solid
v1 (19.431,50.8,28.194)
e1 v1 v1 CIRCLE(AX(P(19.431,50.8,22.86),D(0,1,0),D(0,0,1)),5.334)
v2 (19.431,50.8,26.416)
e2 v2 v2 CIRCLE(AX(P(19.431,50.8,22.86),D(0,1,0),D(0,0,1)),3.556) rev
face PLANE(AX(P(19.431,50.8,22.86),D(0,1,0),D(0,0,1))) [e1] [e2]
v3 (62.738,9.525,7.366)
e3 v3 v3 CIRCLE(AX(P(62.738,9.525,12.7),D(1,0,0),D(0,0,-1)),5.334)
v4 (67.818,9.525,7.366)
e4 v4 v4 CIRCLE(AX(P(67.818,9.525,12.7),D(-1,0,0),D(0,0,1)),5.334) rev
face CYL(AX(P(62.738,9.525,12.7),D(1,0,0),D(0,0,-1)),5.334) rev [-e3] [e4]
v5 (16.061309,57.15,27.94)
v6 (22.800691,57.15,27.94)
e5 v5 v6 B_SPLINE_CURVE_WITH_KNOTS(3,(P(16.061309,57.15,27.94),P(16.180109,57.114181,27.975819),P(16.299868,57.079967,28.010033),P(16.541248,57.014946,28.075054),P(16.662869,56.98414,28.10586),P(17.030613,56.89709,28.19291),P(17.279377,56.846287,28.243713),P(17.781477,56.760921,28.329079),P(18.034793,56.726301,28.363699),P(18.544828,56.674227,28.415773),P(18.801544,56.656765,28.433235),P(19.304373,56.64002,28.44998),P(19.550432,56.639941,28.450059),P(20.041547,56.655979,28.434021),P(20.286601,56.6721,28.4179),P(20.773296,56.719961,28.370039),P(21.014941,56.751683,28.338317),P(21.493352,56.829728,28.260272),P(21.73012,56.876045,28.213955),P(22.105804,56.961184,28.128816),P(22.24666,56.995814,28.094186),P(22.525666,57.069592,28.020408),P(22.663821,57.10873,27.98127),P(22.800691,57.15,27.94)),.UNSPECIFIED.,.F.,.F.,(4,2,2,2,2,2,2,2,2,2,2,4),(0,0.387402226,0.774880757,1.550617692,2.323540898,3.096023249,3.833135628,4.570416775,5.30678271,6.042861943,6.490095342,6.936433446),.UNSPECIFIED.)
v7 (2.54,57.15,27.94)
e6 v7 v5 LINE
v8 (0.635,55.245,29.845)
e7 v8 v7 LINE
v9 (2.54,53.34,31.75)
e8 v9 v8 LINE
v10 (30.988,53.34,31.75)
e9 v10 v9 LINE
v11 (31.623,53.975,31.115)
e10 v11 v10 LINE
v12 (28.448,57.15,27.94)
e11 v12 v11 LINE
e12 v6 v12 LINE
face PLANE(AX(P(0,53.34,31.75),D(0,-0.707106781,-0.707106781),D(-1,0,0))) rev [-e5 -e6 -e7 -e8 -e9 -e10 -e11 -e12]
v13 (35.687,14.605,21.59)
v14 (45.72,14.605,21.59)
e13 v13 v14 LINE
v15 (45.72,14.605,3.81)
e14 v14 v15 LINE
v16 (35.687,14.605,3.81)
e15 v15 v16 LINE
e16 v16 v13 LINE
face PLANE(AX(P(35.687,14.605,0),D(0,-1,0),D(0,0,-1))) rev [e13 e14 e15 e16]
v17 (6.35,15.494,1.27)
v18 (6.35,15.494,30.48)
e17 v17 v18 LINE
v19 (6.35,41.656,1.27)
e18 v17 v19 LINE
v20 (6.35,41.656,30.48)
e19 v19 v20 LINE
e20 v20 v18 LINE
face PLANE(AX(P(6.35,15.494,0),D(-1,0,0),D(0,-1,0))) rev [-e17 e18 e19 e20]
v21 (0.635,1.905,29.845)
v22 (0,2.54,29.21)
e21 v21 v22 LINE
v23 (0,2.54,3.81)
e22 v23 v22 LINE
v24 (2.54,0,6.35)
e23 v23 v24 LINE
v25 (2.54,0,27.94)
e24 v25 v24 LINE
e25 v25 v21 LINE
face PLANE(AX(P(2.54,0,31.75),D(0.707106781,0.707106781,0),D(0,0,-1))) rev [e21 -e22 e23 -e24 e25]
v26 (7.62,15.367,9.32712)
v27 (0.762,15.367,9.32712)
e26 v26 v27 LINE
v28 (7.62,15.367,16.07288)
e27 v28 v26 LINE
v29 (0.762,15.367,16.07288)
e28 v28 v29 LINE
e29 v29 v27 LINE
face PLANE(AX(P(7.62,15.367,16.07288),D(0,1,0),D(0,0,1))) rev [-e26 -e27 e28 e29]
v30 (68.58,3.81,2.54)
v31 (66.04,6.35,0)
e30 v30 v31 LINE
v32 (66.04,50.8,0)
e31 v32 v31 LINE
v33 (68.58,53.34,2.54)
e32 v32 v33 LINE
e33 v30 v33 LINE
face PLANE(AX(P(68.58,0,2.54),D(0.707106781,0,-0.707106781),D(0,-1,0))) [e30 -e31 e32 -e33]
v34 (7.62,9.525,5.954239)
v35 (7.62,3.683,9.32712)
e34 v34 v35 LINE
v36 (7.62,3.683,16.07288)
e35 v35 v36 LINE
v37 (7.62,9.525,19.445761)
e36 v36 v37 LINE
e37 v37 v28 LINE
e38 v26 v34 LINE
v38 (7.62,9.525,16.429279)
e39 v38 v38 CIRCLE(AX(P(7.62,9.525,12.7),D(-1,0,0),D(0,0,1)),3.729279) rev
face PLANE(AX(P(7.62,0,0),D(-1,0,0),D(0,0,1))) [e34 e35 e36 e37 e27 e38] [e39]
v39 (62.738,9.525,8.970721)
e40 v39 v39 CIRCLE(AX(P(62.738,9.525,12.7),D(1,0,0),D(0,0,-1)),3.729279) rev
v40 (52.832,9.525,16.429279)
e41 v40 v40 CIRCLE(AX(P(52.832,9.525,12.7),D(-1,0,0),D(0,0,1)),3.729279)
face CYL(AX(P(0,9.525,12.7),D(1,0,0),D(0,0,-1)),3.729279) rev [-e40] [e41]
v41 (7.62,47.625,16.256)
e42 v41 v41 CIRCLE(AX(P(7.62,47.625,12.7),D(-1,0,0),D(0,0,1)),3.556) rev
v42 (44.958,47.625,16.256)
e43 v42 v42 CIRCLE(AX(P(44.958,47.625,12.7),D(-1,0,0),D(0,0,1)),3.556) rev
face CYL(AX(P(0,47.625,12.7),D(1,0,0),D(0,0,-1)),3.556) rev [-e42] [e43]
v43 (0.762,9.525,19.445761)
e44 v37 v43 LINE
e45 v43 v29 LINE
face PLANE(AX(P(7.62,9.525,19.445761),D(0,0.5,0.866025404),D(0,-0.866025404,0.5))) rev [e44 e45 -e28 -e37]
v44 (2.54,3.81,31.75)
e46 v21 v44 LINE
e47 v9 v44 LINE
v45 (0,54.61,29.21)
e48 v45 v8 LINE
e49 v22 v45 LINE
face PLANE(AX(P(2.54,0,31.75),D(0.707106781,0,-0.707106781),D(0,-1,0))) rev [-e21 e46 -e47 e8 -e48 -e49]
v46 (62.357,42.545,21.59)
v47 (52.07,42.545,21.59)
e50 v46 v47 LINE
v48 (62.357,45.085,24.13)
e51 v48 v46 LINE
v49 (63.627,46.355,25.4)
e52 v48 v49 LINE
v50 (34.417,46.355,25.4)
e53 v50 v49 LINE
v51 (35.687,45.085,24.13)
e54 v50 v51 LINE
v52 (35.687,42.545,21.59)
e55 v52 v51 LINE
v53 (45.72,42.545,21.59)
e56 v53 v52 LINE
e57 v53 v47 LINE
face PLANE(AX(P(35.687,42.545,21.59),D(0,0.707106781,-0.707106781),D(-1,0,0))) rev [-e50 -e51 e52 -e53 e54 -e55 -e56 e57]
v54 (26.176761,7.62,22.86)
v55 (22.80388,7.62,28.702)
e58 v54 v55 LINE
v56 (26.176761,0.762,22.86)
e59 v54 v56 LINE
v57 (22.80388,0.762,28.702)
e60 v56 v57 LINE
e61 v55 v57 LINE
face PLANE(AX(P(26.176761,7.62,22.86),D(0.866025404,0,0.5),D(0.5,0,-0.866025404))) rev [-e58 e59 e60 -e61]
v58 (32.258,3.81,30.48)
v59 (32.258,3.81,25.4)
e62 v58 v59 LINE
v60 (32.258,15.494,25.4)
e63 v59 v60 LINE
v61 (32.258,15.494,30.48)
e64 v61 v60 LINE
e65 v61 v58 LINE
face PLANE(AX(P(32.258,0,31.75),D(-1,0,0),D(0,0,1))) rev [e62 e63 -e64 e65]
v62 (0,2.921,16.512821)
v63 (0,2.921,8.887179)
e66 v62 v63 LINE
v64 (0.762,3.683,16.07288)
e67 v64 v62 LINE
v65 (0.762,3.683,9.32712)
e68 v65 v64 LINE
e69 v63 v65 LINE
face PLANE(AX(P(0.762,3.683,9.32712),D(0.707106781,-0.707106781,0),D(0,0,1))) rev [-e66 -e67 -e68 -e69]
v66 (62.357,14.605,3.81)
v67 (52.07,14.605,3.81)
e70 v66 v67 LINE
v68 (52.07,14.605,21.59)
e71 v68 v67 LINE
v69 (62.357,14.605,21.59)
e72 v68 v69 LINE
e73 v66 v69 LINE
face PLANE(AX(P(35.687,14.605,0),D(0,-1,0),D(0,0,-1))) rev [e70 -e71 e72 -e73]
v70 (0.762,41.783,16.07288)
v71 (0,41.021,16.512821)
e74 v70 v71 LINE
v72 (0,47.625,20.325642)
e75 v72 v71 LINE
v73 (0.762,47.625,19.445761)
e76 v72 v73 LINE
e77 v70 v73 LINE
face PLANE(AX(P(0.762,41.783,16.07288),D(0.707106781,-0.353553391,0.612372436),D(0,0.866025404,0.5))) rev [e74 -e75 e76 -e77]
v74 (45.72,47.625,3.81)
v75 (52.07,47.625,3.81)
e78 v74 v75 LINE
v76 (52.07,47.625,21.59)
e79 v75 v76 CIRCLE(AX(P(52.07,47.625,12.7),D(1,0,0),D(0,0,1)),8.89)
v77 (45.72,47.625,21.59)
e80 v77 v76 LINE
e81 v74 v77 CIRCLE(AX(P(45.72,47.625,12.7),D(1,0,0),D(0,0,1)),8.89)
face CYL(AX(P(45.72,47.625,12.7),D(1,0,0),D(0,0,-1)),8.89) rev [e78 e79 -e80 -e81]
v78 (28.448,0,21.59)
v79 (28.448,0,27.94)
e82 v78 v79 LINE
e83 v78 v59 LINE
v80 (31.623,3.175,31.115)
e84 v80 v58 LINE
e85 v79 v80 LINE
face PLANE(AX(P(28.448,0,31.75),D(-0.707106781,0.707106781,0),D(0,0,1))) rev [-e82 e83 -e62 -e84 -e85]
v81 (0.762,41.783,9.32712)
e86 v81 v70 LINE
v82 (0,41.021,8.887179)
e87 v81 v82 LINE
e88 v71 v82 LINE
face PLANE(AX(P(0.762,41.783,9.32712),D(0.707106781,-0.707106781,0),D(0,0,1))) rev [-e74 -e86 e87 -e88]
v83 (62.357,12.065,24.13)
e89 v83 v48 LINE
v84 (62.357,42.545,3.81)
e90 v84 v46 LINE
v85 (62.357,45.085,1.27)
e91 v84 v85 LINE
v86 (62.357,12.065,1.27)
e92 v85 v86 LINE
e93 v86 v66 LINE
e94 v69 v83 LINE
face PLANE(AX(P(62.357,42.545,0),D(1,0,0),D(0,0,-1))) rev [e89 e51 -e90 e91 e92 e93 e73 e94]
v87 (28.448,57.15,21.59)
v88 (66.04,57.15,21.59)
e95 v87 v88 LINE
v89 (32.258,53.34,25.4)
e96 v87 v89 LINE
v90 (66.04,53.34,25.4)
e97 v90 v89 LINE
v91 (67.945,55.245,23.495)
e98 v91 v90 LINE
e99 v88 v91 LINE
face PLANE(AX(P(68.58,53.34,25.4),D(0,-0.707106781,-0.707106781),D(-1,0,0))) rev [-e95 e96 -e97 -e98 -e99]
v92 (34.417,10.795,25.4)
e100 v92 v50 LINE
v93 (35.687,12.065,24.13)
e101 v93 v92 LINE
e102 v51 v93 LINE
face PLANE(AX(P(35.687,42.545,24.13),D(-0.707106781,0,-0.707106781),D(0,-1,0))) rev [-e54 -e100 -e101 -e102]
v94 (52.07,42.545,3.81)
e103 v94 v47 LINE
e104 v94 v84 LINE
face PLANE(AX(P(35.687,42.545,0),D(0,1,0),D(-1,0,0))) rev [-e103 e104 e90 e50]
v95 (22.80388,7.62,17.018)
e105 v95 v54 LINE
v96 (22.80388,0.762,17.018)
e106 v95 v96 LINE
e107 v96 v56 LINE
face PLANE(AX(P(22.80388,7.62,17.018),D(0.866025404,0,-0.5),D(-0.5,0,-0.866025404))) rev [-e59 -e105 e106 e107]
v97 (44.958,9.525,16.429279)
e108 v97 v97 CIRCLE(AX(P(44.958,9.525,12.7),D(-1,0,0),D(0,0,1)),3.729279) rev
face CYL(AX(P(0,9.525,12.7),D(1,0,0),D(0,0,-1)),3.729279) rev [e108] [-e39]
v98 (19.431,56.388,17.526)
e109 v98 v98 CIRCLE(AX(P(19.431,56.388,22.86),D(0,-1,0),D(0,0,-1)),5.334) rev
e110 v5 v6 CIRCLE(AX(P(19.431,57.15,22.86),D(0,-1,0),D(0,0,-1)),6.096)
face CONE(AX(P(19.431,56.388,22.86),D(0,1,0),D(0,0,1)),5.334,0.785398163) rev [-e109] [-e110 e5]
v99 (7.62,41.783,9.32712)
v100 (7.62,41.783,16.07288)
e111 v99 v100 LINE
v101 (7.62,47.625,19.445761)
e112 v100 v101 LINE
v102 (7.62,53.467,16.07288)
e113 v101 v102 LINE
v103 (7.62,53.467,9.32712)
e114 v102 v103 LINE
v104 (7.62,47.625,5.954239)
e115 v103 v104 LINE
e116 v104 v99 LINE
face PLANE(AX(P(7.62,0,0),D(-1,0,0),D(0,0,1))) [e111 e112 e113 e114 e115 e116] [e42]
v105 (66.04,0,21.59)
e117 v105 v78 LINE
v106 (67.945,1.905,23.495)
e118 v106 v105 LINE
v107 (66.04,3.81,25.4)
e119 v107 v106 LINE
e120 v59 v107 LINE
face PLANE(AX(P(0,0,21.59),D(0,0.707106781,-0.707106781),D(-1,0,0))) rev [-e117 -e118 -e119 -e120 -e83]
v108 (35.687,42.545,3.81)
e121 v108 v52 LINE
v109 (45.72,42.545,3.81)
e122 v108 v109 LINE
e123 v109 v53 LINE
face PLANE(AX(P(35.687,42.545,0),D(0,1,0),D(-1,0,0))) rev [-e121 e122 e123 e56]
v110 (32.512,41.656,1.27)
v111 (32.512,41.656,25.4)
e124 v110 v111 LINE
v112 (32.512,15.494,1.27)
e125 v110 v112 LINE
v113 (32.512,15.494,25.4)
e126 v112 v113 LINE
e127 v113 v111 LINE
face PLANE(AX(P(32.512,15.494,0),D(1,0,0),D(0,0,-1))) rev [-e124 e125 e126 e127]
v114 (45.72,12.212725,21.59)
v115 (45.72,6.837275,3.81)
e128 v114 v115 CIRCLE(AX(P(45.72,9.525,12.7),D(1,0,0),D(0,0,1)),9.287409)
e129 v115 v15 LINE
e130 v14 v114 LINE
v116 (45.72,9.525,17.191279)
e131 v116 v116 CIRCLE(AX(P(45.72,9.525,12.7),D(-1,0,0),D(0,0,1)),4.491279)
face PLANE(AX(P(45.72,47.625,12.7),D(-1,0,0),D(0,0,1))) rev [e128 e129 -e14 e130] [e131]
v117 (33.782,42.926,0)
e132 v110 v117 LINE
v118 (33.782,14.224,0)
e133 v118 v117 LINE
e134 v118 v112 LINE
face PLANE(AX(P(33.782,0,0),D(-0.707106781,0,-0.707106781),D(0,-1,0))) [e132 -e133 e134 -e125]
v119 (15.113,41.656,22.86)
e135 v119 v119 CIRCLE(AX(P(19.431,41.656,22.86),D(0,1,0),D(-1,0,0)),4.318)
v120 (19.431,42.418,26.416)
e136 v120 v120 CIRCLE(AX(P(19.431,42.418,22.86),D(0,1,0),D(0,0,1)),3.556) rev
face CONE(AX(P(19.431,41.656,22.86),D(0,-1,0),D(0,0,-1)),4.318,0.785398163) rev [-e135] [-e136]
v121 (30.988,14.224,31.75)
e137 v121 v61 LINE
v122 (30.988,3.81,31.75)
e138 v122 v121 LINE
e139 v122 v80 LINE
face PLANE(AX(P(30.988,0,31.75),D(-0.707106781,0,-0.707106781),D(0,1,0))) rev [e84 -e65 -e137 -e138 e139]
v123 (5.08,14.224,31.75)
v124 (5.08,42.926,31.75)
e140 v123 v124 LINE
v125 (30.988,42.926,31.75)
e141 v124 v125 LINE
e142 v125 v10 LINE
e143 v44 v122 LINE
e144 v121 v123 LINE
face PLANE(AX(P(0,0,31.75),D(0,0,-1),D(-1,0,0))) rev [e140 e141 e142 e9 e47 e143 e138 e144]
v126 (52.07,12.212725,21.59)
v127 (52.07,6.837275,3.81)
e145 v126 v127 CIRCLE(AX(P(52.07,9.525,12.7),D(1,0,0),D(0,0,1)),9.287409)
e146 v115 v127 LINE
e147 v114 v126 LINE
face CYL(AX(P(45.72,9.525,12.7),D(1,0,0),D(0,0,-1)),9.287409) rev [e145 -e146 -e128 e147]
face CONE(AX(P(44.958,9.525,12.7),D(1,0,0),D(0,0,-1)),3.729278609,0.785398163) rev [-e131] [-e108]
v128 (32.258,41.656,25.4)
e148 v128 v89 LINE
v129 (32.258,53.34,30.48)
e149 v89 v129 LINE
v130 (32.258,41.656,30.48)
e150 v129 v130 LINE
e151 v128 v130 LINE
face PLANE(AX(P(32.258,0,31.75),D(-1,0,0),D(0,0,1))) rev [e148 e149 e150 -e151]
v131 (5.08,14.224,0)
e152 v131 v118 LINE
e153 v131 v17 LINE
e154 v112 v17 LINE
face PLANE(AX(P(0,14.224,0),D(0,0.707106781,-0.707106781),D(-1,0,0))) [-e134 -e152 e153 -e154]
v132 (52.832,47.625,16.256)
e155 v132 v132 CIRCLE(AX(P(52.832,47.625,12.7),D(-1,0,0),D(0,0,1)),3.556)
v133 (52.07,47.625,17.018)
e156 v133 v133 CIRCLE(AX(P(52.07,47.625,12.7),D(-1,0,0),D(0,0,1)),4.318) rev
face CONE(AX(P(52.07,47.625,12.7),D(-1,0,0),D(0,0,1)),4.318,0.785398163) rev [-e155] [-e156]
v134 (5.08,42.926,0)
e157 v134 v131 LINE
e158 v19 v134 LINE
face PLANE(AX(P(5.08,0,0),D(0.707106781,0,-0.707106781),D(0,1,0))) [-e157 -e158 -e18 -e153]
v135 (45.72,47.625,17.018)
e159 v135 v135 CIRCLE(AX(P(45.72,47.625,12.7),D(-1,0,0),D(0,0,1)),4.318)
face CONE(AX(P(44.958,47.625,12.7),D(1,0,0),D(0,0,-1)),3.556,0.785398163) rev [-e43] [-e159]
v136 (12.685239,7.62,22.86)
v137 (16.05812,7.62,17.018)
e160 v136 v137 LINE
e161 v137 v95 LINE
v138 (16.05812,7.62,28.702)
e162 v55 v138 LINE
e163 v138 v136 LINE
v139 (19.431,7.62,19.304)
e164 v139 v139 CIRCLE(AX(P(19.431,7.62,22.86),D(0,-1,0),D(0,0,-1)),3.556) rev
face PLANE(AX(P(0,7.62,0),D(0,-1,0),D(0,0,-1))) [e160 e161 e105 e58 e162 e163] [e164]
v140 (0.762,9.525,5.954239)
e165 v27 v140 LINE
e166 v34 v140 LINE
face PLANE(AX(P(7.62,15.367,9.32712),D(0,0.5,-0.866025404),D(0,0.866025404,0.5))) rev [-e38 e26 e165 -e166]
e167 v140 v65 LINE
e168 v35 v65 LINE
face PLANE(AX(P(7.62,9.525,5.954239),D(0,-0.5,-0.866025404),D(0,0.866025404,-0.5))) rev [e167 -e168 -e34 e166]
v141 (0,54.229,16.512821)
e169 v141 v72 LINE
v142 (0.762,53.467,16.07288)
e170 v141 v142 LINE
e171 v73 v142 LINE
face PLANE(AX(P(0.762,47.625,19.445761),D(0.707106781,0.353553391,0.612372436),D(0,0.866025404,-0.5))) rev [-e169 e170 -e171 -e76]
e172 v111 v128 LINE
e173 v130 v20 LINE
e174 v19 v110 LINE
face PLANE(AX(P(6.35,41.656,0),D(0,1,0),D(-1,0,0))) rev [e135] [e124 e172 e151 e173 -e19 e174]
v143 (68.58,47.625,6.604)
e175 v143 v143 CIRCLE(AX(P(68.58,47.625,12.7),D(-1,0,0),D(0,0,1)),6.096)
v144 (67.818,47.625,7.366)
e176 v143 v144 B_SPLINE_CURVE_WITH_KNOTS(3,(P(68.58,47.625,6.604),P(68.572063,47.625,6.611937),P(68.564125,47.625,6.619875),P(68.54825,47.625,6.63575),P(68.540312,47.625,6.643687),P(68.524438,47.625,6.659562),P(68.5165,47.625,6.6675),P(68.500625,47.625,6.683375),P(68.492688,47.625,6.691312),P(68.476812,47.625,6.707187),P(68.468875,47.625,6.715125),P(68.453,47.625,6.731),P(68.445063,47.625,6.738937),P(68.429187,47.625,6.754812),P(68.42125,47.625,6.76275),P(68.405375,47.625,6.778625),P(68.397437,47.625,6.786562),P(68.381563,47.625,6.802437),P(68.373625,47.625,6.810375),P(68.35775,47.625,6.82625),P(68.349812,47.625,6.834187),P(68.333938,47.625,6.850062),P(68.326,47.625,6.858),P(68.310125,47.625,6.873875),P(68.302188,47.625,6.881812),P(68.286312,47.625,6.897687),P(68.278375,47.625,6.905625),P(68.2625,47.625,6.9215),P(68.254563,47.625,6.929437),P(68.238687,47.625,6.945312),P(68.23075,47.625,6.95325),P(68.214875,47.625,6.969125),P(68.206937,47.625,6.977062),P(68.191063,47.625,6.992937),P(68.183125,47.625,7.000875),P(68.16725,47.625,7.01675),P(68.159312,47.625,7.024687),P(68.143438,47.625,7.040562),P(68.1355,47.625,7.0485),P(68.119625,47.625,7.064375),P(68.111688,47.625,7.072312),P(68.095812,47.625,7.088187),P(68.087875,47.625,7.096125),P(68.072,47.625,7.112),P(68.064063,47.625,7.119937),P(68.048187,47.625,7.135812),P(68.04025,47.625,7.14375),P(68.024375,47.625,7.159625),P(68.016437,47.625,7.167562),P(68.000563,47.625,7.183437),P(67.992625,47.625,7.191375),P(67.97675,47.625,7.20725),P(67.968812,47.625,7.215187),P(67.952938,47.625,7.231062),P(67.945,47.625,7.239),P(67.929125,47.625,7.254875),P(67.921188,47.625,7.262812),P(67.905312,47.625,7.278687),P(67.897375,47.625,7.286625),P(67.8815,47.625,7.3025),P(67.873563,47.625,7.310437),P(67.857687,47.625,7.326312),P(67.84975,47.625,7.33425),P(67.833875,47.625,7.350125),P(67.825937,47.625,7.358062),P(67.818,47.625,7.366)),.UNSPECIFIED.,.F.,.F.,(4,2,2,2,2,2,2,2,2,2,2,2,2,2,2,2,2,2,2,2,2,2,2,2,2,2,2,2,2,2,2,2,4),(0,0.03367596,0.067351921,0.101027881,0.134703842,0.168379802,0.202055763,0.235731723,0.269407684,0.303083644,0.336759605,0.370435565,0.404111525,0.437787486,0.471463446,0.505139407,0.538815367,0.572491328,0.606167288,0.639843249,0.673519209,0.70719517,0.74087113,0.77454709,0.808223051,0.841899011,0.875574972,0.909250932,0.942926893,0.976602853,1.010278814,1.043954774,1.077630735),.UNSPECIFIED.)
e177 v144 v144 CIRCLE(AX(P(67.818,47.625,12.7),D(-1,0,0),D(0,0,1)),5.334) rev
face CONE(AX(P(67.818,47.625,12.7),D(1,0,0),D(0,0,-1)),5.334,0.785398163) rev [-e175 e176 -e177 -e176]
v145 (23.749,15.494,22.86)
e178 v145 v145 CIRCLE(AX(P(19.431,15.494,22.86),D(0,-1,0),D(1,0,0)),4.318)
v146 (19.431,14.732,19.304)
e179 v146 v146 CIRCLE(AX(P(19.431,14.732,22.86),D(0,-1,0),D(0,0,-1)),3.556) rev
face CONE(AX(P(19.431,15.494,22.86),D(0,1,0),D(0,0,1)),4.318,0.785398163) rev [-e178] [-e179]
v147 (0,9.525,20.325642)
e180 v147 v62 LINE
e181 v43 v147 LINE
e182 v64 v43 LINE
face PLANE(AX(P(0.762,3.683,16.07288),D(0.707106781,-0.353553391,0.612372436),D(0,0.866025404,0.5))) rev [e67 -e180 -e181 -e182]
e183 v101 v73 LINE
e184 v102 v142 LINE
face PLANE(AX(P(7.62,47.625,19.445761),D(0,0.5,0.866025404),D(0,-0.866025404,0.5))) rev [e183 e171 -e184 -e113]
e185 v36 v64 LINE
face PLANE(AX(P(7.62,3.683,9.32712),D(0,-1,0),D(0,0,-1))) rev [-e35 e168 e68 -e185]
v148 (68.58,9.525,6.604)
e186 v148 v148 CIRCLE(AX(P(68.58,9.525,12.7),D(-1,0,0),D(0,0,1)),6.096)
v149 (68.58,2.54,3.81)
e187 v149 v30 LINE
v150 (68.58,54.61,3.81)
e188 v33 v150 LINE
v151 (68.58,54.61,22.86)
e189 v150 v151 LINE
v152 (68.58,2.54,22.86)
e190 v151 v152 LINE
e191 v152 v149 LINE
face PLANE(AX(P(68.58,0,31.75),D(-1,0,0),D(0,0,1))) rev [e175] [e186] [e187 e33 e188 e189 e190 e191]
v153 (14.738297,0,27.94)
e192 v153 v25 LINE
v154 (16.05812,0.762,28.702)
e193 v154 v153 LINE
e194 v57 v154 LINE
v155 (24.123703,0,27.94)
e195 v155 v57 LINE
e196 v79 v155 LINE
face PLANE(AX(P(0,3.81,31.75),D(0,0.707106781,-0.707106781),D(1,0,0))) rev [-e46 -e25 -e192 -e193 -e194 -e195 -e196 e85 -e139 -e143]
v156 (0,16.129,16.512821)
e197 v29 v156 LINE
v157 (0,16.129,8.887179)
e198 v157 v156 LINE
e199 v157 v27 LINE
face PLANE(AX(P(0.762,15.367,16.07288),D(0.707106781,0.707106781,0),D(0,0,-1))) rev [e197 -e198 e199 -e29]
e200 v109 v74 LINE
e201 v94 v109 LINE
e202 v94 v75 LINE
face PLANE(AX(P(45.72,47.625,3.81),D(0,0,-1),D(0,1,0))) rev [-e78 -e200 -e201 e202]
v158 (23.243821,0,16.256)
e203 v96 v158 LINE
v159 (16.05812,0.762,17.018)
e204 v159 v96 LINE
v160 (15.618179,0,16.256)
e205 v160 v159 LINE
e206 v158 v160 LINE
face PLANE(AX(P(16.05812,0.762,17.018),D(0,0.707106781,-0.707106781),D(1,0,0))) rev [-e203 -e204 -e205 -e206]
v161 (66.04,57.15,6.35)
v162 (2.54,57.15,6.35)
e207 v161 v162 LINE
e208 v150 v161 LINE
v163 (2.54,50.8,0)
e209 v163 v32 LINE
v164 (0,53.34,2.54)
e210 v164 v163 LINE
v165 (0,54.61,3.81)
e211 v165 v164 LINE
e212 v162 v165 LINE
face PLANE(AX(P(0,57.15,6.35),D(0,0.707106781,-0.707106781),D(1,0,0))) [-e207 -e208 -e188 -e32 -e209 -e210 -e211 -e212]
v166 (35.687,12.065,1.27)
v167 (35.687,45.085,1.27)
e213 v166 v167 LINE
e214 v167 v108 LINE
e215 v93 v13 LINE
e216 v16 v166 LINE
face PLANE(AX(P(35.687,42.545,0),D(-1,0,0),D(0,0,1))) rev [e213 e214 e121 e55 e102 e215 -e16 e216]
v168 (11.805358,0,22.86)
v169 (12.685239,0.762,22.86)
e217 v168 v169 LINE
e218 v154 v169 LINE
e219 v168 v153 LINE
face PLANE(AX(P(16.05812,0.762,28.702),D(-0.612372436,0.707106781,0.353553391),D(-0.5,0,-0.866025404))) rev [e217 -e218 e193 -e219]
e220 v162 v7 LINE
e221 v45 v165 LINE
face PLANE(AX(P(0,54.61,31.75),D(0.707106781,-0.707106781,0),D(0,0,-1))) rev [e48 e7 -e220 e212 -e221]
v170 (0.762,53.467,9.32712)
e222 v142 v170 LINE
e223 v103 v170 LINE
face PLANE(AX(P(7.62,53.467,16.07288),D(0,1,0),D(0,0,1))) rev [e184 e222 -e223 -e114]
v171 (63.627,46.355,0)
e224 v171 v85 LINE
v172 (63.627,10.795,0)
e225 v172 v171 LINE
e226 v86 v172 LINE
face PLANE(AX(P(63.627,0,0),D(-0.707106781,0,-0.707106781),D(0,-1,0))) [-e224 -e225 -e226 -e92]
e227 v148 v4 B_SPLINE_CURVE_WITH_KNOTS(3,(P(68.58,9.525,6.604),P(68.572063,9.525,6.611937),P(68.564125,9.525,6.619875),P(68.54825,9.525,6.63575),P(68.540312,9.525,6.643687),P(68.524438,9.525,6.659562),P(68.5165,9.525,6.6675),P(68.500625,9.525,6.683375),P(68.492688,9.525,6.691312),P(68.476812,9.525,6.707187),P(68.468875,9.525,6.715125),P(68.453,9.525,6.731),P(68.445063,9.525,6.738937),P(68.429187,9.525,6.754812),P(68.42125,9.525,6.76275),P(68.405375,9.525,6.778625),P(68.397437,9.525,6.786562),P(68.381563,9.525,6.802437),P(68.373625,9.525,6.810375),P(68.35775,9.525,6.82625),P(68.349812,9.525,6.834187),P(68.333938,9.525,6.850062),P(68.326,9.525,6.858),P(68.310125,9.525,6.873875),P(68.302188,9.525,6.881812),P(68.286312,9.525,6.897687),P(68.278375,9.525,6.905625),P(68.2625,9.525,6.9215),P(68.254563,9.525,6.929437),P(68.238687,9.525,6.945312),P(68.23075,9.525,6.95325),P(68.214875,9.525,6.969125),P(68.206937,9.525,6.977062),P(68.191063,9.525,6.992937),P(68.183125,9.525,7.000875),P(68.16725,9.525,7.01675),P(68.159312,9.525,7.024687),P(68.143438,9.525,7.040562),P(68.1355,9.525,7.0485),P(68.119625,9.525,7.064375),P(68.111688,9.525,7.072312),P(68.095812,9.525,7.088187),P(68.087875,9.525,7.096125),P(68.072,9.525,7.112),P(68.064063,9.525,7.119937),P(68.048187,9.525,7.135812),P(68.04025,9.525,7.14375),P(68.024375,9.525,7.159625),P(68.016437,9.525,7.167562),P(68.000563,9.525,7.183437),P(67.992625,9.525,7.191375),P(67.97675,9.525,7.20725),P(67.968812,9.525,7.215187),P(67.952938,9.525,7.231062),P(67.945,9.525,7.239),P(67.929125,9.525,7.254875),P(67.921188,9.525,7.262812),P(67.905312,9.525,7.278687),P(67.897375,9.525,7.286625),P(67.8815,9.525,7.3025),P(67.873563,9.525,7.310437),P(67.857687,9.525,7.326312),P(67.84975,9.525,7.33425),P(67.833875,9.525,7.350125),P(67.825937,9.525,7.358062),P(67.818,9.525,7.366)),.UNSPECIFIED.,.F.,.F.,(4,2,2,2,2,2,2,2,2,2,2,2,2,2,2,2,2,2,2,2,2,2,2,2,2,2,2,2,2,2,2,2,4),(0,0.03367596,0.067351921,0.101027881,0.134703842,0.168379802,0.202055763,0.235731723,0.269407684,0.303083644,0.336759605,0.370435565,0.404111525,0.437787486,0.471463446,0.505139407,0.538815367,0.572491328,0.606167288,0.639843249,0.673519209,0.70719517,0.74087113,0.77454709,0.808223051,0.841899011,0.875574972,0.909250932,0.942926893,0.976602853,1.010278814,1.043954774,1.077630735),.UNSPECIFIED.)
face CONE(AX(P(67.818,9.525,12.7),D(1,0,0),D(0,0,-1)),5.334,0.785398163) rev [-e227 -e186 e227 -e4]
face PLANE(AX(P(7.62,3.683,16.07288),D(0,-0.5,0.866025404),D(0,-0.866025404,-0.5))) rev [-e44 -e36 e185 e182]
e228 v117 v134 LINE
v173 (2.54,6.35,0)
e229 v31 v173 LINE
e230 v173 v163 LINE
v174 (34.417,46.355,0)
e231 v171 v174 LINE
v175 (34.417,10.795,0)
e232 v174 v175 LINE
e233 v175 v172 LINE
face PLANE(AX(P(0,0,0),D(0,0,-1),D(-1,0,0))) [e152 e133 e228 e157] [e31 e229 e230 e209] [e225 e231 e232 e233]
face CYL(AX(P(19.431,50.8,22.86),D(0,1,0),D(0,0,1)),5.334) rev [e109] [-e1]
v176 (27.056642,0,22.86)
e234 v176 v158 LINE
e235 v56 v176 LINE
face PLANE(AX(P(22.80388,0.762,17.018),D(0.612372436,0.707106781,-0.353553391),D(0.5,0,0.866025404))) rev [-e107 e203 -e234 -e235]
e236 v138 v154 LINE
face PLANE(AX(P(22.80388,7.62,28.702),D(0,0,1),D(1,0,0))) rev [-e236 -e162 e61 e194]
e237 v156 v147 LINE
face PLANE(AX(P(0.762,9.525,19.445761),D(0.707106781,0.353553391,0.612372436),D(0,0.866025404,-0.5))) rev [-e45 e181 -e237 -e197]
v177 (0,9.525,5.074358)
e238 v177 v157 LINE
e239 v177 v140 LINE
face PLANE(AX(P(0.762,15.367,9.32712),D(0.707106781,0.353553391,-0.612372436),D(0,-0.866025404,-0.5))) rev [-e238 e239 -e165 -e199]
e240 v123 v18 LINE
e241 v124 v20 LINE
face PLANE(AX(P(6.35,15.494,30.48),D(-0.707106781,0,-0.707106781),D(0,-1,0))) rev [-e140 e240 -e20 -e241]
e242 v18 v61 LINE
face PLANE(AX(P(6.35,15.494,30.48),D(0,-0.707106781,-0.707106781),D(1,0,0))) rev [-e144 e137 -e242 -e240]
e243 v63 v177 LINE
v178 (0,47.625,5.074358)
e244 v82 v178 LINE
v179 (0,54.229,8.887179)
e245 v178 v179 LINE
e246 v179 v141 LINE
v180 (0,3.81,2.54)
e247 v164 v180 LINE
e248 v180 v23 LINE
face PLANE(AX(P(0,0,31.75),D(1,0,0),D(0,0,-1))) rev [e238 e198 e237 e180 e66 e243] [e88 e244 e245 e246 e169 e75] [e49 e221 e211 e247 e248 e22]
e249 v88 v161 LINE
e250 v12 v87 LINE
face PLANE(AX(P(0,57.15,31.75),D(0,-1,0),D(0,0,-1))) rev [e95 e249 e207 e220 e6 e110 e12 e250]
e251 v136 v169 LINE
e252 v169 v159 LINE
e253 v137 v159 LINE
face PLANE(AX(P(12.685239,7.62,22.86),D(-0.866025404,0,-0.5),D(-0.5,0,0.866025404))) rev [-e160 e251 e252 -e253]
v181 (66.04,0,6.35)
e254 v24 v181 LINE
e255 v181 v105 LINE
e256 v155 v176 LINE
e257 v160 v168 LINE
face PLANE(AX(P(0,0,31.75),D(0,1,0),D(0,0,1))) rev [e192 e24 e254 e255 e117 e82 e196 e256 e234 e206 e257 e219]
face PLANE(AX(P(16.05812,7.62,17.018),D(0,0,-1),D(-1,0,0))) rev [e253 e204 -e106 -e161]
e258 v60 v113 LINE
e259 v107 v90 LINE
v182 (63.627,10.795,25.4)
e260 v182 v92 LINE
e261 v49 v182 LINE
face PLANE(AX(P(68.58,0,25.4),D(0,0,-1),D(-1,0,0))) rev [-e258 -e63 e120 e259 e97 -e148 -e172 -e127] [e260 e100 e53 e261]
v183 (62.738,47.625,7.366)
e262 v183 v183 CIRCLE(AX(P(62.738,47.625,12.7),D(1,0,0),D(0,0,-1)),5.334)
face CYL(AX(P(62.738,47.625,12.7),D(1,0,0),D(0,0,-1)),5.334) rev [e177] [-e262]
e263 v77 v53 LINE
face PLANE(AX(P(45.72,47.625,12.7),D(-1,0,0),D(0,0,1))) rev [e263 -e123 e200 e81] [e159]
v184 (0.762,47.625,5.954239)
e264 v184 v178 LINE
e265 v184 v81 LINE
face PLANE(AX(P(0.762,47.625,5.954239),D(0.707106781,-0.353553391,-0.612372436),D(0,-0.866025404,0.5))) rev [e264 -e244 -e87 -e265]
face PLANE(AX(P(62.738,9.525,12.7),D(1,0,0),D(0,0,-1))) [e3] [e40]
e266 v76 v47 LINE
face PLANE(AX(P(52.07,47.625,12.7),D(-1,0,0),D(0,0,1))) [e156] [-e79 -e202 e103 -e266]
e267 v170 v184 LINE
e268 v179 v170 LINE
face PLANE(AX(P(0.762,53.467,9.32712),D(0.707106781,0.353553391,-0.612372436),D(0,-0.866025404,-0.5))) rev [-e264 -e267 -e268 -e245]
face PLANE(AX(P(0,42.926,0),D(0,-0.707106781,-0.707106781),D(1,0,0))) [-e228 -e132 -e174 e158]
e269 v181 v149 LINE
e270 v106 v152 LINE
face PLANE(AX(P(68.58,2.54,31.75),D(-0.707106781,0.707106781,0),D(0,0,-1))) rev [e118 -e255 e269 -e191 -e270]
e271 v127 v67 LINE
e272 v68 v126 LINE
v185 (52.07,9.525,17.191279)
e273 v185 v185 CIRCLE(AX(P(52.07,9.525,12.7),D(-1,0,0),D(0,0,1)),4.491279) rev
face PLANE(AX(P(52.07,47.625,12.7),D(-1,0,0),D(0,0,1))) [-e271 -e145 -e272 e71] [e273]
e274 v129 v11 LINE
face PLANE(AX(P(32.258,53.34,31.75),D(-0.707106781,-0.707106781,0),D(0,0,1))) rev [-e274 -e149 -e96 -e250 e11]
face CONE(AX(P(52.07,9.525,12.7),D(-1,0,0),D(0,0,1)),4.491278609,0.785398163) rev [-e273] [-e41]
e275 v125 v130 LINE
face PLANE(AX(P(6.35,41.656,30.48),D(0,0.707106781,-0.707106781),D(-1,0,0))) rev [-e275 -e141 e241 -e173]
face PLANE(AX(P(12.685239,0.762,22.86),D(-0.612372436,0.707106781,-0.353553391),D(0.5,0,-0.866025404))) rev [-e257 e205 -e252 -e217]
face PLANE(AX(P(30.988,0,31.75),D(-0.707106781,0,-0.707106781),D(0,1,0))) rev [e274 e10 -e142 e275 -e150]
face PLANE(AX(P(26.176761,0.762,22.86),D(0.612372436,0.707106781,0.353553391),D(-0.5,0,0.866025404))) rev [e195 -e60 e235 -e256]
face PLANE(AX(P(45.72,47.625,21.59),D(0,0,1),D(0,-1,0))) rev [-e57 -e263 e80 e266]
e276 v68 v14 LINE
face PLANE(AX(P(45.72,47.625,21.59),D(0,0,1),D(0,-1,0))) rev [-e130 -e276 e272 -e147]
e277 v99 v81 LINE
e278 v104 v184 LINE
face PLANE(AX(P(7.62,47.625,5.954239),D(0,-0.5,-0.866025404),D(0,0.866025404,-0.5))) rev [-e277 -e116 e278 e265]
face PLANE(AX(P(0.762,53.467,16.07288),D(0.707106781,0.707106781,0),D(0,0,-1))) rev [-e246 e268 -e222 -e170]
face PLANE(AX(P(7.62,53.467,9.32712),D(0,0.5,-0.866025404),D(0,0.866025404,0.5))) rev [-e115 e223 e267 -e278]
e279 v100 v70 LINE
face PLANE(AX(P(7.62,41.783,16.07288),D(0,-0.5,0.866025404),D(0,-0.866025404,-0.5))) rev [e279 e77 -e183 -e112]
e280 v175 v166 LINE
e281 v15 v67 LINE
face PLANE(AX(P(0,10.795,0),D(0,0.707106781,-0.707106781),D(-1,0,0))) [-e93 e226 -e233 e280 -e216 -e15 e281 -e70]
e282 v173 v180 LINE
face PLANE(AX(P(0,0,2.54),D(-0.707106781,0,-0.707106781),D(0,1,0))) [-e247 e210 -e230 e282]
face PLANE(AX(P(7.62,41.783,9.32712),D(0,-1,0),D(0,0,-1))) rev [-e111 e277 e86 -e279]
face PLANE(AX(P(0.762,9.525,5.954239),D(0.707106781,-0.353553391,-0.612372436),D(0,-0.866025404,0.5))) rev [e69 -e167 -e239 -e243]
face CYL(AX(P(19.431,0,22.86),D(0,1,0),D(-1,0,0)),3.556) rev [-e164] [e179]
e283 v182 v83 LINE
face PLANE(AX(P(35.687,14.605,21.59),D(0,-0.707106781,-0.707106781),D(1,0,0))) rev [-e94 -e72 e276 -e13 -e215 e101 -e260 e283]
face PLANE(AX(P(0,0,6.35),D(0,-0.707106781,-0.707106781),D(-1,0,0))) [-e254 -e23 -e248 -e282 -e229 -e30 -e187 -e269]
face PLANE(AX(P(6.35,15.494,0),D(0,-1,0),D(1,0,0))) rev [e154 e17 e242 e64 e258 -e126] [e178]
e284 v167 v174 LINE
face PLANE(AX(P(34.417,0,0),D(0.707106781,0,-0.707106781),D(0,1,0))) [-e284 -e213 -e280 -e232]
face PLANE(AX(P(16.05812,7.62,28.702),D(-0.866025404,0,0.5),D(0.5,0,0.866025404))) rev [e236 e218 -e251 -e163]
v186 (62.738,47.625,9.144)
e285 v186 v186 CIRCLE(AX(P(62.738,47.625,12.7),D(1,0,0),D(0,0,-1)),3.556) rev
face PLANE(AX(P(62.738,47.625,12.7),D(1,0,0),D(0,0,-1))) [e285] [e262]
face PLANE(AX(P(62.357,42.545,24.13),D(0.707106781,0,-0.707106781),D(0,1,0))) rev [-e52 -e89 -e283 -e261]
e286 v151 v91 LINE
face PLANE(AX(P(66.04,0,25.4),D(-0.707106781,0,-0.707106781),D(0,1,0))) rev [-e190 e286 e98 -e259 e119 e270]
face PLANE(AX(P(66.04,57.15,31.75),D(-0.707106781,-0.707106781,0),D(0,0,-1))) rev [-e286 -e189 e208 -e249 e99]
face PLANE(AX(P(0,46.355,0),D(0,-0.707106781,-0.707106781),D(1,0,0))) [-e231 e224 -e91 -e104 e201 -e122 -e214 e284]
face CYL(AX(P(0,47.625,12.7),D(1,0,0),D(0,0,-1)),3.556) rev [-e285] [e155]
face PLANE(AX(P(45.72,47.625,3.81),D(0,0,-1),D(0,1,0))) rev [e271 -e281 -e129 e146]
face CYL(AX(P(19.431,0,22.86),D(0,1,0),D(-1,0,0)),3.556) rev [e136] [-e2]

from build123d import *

# Parameters (mm, degrees)
SKETCH1_W               = 68.58
SKETCH1_H               = 57.15
BOSS_EXTRUDE1_DEPTH     = 31.75
SKETCH2_W               = 26.162
SKETCH2_H               = 26.162
SKETCH2_W_2             = 26.67
SKETCH2_H_2             = 27.94
CUT_EXTRUDE1_DEPTH      = 95.749149864
SKETCH5_R               = 3.556
SKETCH5_R_2             = 3.729278609
CUT_EXTRUDE2_DEPTH      = 95.749149864
CUT_EXTRUDE3_START      = -16.51
CUT_EXTRUDE3_DEPTH      = 6.35
SKETCH7_R               = 5.334
CUT_EXTRUDE4_DEPTH      = 5.842
CUT_EXTRUDE5_DEPTH      = 7.62
SKETCH10_W              = 36.322
SKETCH10_H              = 6.35
CUT_EXTRUDE6_DEPTH      = 95.749149864
CUT_EXTRUDE7_DEPTH      = 87.293112332
CUT_EXTRUDE7_DEPTH_BACK = 87.293112332
SKETCH12_R              = 3.556
SKETCH13_R              = 5.334
CUT_EXTRUDE8_DEPTH      = 6.35
CUT_EXTRUDE9_DEPTH      = 7.62
CHAMFER1_SIZE           = 0.762
CHAMFER3_SIZE           = 3.81
CHAMFER5_SIZE           = 1.27
CHAMFER6_SIZE           = 2.54
CHAMFER9_SIZE           = 3.81
CHAMFER10_SIZE          = 6.35


# Some blends are built 0.0001 mm under size
with BuildPart() as part:
    # Sketch1 → Boss-Extrude1 (new body)
    with BuildSketch(Plane.XY):
        with Locations((34.29, 28.575)):
            Rectangle(SKETCH1_W, SKETCH1_H)
    extrude(amount=BOSS_EXTRUDE1_DEPTH)

    # Sketch2 → Cut-Extrude1 (cut, through all)
    with BuildSketch(Plane.XY.offset(31.75)):
        with Locations((19.431, 28.575)):
            Rectangle(SKETCH2_W, SKETCH2_H)
        with Locations((49.022, 28.575)):
            Rectangle(SKETCH2_W_2, SKETCH2_H_2)
    extrude(amount=-CUT_EXTRUDE1_DEPTH, mode=Mode.SUBTRACT)

    # Sketch5 → Cut-Extrude2 (cut, through all)
    with BuildSketch(Plane(origin=(68.58, 0, 0), x_dir=(0, 0, -1), z_dir=(1, 0, 0))):
        with Locations((-12.7, 47.625)):
            Circle(SKETCH5_R)
        with Locations((-12.7, 9.525)):
            Circle(SKETCH5_R_2)
    extrude(amount=-CUT_EXTRUDE2_DEPTH, mode=Mode.SUBTRACT)

    # Sketch6 → Cut-Extrude3 (cut)
    with BuildSketch(Plane(origin=(68.58, 0, 0), x_dir=(0, 0, -1), z_dir=(1, 0, 0)).offset(CUT_EXTRUDE3_START)):
        with BuildLine():
            Line((-21.59, 47.625), (-21.59, 12.21272508))
            ThreePointArc((-21.59, 12.21272508), (-15.38772508, 0.635), (-3.81, 6.83727492))
            Line((-3.81, 6.83727492), (-3.81, 47.625))
            ThreePointArc((-3.81, 47.625), (-12.7, 56.515), (-21.59, 47.625))
        make_face()
    extrude(amount=-CUT_EXTRUDE3_DEPTH, mode=Mode.SUBTRACT)

    # Sketch7 → Cut-Extrude4 (cut)
    with BuildSketch(Plane(origin=(68.58, 0, 0), x_dir=(0, 0, -1), z_dir=(1, 0, 0))):
        with Locations((-12.7, 47.625)):
            Circle(SKETCH7_R)
        with Locations((-12.7, 9.525)):
            Circle(SKETCH7_R)
    extrude(amount=-CUT_EXTRUDE4_DEPTH, mode=Mode.SUBTRACT)

    # Sketch9 → Cut-Extrude5 (cut)
    with BuildSketch(Plane.ZY):
        Polygon((16.072880273, 53.467), (9.327119727, 53.467), (5.954239455, 47.625), (9.327119727, 41.783), (16.072880273, 41.783), (19.445760545, 47.625), align=None)
        Polygon((16.072880273, 15.367), (9.327119727, 15.367), (5.954239455, 9.525), (9.327119727, 3.683), (16.072880273, 3.683), (19.445760545, 9.525), align=None)
    extrude(amount=-CUT_EXTRUDE5_DEPTH, mode=Mode.SUBTRACT)

    # Sketch10 → Cut-Extrude6 (cut, through all)
    with BuildSketch(Plane(origin=(0, 57.15, 0), x_dir=(1, 0, 0), z_dir=(0, 1, 0))):
        with Locations((50.419, -28.575)):
            Rectangle(SKETCH10_W, SKETCH10_H)
    extrude(amount=-CUT_EXTRUDE6_DEPTH, mode=Mode.SUBTRACT)

    # Sketch12 → Cut-Extrude7 (cut, two sides: drawn at the far end of the back side and taken through both)
    with BuildSketch(Plane(origin=(0, 15.494, 0), x_dir=(1, 0, 0), z_dir=(0, 1, 0)).offset(-CUT_EXTRUDE7_DEPTH_BACK)):
        with Locations(Location((19.431, -22.86, 0), (0, 0, 180))):
            Circle(SKETCH12_R)
    extrude(amount=CUT_EXTRUDE7_DEPTH + CUT_EXTRUDE7_DEPTH_BACK, mode=Mode.SUBTRACT)

    # Sketch13 → Cut-Extrude8 (cut)
    with BuildSketch(Plane(origin=(0, 57.15, 0), x_dir=(1, 0, 0), z_dir=(0, 1, 0))):
        with Locations(Location((19.431, -22.86, 0), (0, 0, 270))):
            Circle(SKETCH13_R)
    extrude(amount=-CUT_EXTRUDE8_DEPTH, mode=Mode.SUBTRACT)

    # Sketch14 → Cut-Extrude9 (cut)
    with BuildSketch(Plane.XZ):
        Polygon((22.803880273, 28.702), (16.058119727, 28.702), (12.685239455, 22.86), (16.058119727, 17.018), (22.803880273, 17.018), (26.176760545, 22.86), align=None)
    extrude(amount=-CUT_EXTRUDE9_DEPTH, mode=Mode.SUBTRACT)

    # Chamfer1
    chamfer1_edges = [part.edges().sort_by_distance(p)[0] for p in [
        (0, 50.546, 17.759320409),
        (0, 53.467, 12.7),
        (0, 50.546, 7.640679591),
        (0, 44.704, 7.640679591),
        (0, 41.783, 12.7),
        (0, 44.704, 17.759320409),
        (0, 12.446, 17.759320409),
        (0, 15.367, 12.7),
        (0, 12.446, 7.640679591),
        (0, 6.604, 7.640679591),
        (0, 3.683, 12.7),
        (0, 6.604, 17.759320409),
        (22.987, 41.656, 22.86),
        (22.987, 15.494, 22.86),
        (19.431, 57.15, 17.526),
        (24.490320409, 0, 25.781),
        (19.431, 0, 28.702),
        (14.371679591, 0, 25.781),
        (14.371679591, 0, 19.939),
        (19.431, 0, 17.018),
        (24.490320409, 0, 19.939),
        (45.72, 47.625, 16.256),
        (45.72, 9.525, 16.429278609),
        (52.07, 9.525, 16.429278609),
        (52.07, 47.625, 16.256),
        (68.58, 47.625, 18.034),
        (68.58, 9.525, 18.034),
    ]]
    chamfer(chamfer1_edges, length=CHAMFER1_SIZE)

    # Chamfer3
    chamfer3_edges = [part.edges().sort_by_distance(p)[0] for p in [
        (49.022, 42.545, 25.4),
        (49.022, 14.605, 25.4),
        (49.022, 42.545, 0),
        (49.022, 14.605, 0),
    ]]
    chamfer(chamfer3_edges, length=CHAMFER3_SIZE - 0.0001)  # a hair under: the kernel refuses the full size

    # Chamfer5
    chamfer5_edges = [part.edges().sort_by_distance(p)[0] for p in [
        (19.304, 41.656, 31.75),
        (32.258, 49.403, 31.75),
        (32.258, 7.747, 31.75),
        (35.687, 28.575, 25.4),
        (62.357, 28.575, 25.4),
        (6.35, 28.575, 0),
        (19.431, 41.656, 0),
        (32.512, 28.575, 0),
        (19.431, 15.494, 0),
        (6.35, 28.575, 31.75),
        (19.304, 15.494, 31.75),
        (35.687, 28.575, 0),
        (62.357, 28.575, 0),
    ]]
    chamfer(chamfer5_edges, length=CHAMFER5_SIZE)

    # Chamfer6
    chamfer6_edges = [part.edges().sort_by_distance(p)[0] for p in [
        (68.58, 57.15, 12.7),
        (68.58, 0, 12.7),
        (68.58, 28.575, 25.4),
        (0, 28.575, 31.75),
        (68.58, 28.575, 0),
        (0, 28.575, 0),
        (0, 57.15, 15.875),
        (0, 0, 15.875),
    ]]
    chamfer(chamfer6_edges, length=CHAMFER6_SIZE)

    # Chamfer9
    # the kernel refuses this chamfer: 3.81 mm, written as the material it takes off along each edge
    with BuildSketch(Plane(origin=(32.258, 57.15, 25.4), x_dir=(0, 0.027495876610586386, -0.9996219169112968), z_dir=(1, 0, 0))) as chamfer9_piece_1:
        Polygon((CHAMFER9_SIZE * 0.999621916911, -CHAMFER9_SIZE * 0.0274958766106), (-CHAMFER9_SIZE * 0.0274958766106, -CHAMFER9_SIZE * 0.999621916911), (0, 0), align=None)
    extrude(amount=43.580112184, mode=Mode.SUBTRACT)
    with BuildSketch(Plane(origin=(32.258, 57.15, 40.278112184), x_dir=(-0.9996219169112968, 0.027495876610586414, 0), z_dir=(0, 0, -1))) as chamfer9_piece_2:
        Polygon((CHAMFER9_SIZE * 0.999621916911, -CHAMFER9_SIZE * 0.0274958766106), (-CHAMFER9_SIZE * 0.0274958766106, -CHAMFER9_SIZE * 0.999621916911), (0, 0), align=None)
    extrude(amount=14.878112184, mode=Mode.SUBTRACT)
    with BuildSketch(Plane(origin=(40.786112184, 57.15, 31.75), x_dir=(0, 0.027495876610586386, -0.9996219169112968), z_dir=(-1, 0, 0)), Plane(origin=(-7.258112184, 0, 31.75), x_dir=(0, -0.027495876610586376, -0.9996219169112968), z_dir=(1, 0, 0))) as chamfer9_piece_3:
        Polygon((CHAMFER9_SIZE * 0.999621916911, CHAMFER9_SIZE * 0.0274958766106), (-CHAMFER9_SIZE * 0.0274958766106, CHAMFER9_SIZE * 0.999621916911), (0, 0), align=None)
    extrude(amount=48.044224368, mode=Mode.SUBTRACT)
    with BuildSketch(Plane(origin=(32.258, 0, 40.278112184), x_dir=(-0.9996219169112968, -0.02749587661058639, 0), z_dir=(0, 0, -1))) as chamfer9_piece_4:
        Polygon((CHAMFER9_SIZE * 0.999621916911, CHAMFER9_SIZE * 0.0274958766106), (-CHAMFER9_SIZE * 0.0274958766106, CHAMFER9_SIZE * 0.999621916911), (0, 0), align=None)
    extrude(amount=14.878112184, mode=Mode.SUBTRACT)
    with BuildSketch(Plane(origin=(32.258, 0, 25.4), x_dir=(0, -0.027495876610586403, -0.9996219169112968), z_dir=(1, 0, 0))) as chamfer9_piece_5:
        Polygon((CHAMFER9_SIZE * 0.999621916911, CHAMFER9_SIZE * 0.0274958766106), (-CHAMFER9_SIZE * 0.0274958766106, CHAMFER9_SIZE * 0.999621916911), (0, 0), align=None)
    extrude(amount=43.580112184, mode=Mode.SUBTRACT)
    with BuildSketch(Plane(origin=(32.258, 57.15, 40.278112184), x_dir=(-0.9996219169112968, 0.027495876610586414, 0), z_dir=(0, 0, -1))) as chamfer9_piece_6a_section:
        Polygon((CHAMFER9_SIZE * 0.999621916911, -CHAMFER9_SIZE * 0.0274958766106), (-CHAMFER9_SIZE * 0.0274958766106, -CHAMFER9_SIZE * 0.999621916911), (0, 0), align=None)
    chamfer9_piece_6a = extrude(amount=24.676224368, mode=Mode.PRIVATE)
    chamfer9_piece_6a = split(chamfer9_piece_6a, bisect_by=Plane(origin=(31.001486282, 55.893486282, 25.4), z_dir=(0, 0, -1)), keep=Keep.TOP, mode=Mode.PRIVATE)
    with BuildSketch(Plane(origin=(22.459887816, 57.15, 25.4), x_dir=(0, 0.027495876610586386, -0.9996219169112968), z_dir=(1, 0, 0))) as chamfer9_piece_6b_section:
        Polygon((CHAMFER9_SIZE * 0.999621916911, -CHAMFER9_SIZE * 0.0274958766106), (-CHAMFER9_SIZE * 0.0274958766106, -CHAMFER9_SIZE * 0.999621916911), (0, 0), align=None)
    chamfer9_piece_6b = extrude(amount=53.378224368, mode=Mode.PRIVATE)
    chamfer9_piece_6b = split(chamfer9_piece_6b, bisect_by=Plane(origin=(32.258, 55.893486282, 24.143486282), z_dir=(-1, 0, 0)), keep=Keep.TOP, mode=Mode.PRIVATE)
    chamfer9_piece_6 = chamfer9_piece_6a & chamfer9_piece_6b
    add(chamfer9_piece_6, mode=Mode.SUBTRACT)
    with BuildSketch(Plane(origin=(32.258, 0, 40.278112184), x_dir=(-0.9996219169112968, -0.02749587661058639, 0), z_dir=(0, 0, -1))) as chamfer9_piece_7a_section:
        Polygon((CHAMFER9_SIZE * 0.999621916911, CHAMFER9_SIZE * 0.0274958766106), (-CHAMFER9_SIZE * 0.0274958766106, CHAMFER9_SIZE * 0.999621916911), (0, 0), align=None)
    chamfer9_piece_7a = extrude(amount=24.676224368, mode=Mode.PRIVATE)
    chamfer9_piece_7a = split(chamfer9_piece_7a, bisect_by=Plane(origin=(31.001486282, 1.256513718, 25.4), z_dir=(0, 0, -1)), keep=Keep.TOP, mode=Mode.PRIVATE)
    with BuildSketch(Plane(origin=(22.459887816, 0, 25.4), x_dir=(0, -0.02749587661058639, -0.9996219169112968), z_dir=(1, 0, 0))) as chamfer9_piece_7b_section:
        Polygon((CHAMFER9_SIZE * 0.999621916911, CHAMFER9_SIZE * 0.0274958766106), (-CHAMFER9_SIZE * 0.0274958766106, CHAMFER9_SIZE * 0.999621916911), (0, 0), align=None)
    chamfer9_piece_7b = extrude(amount=53.378224368, mode=Mode.PRIVATE)
    chamfer9_piece_7b = split(chamfer9_piece_7b, bisect_by=Plane(origin=(32.258, 1.256513718, 24.143486282), z_dir=(-1, 0, 0)), keep=Keep.TOP, mode=Mode.PRIVATE)
    chamfer9_piece_7 = chamfer9_piece_7a & chamfer9_piece_7b
    add(chamfer9_piece_7, mode=Mode.SUBTRACT)

    # Chamfer10
    # the kernel refuses this chamfer: 6.35 mm, written as the material it takes off along each edge
    with BuildSketch(Plane(origin=(82.370186974, 57.15, 0), x_dir=(0, -0.9996219169112968, -0.027495876610586355), z_dir=(-1, 0, 0)), Plane(origin=(-13.790186974, 0, 0), x_dir=(0, 0.9996219169112966, -0.02749587661058638), z_dir=(1, 0, 0))) as chamfer10_piece_1:
        Polygon((CHAMFER10_SIZE * 0.999621916911, CHAMFER10_SIZE * 0.0274958766106), (-CHAMFER10_SIZE * 0.0274958766106, CHAMFER10_SIZE * 0.999621916911), (0, 0), align=None)
    extrude(amount=96.160373947, mode=Mode.SUBTRACT)


solid = part.part
